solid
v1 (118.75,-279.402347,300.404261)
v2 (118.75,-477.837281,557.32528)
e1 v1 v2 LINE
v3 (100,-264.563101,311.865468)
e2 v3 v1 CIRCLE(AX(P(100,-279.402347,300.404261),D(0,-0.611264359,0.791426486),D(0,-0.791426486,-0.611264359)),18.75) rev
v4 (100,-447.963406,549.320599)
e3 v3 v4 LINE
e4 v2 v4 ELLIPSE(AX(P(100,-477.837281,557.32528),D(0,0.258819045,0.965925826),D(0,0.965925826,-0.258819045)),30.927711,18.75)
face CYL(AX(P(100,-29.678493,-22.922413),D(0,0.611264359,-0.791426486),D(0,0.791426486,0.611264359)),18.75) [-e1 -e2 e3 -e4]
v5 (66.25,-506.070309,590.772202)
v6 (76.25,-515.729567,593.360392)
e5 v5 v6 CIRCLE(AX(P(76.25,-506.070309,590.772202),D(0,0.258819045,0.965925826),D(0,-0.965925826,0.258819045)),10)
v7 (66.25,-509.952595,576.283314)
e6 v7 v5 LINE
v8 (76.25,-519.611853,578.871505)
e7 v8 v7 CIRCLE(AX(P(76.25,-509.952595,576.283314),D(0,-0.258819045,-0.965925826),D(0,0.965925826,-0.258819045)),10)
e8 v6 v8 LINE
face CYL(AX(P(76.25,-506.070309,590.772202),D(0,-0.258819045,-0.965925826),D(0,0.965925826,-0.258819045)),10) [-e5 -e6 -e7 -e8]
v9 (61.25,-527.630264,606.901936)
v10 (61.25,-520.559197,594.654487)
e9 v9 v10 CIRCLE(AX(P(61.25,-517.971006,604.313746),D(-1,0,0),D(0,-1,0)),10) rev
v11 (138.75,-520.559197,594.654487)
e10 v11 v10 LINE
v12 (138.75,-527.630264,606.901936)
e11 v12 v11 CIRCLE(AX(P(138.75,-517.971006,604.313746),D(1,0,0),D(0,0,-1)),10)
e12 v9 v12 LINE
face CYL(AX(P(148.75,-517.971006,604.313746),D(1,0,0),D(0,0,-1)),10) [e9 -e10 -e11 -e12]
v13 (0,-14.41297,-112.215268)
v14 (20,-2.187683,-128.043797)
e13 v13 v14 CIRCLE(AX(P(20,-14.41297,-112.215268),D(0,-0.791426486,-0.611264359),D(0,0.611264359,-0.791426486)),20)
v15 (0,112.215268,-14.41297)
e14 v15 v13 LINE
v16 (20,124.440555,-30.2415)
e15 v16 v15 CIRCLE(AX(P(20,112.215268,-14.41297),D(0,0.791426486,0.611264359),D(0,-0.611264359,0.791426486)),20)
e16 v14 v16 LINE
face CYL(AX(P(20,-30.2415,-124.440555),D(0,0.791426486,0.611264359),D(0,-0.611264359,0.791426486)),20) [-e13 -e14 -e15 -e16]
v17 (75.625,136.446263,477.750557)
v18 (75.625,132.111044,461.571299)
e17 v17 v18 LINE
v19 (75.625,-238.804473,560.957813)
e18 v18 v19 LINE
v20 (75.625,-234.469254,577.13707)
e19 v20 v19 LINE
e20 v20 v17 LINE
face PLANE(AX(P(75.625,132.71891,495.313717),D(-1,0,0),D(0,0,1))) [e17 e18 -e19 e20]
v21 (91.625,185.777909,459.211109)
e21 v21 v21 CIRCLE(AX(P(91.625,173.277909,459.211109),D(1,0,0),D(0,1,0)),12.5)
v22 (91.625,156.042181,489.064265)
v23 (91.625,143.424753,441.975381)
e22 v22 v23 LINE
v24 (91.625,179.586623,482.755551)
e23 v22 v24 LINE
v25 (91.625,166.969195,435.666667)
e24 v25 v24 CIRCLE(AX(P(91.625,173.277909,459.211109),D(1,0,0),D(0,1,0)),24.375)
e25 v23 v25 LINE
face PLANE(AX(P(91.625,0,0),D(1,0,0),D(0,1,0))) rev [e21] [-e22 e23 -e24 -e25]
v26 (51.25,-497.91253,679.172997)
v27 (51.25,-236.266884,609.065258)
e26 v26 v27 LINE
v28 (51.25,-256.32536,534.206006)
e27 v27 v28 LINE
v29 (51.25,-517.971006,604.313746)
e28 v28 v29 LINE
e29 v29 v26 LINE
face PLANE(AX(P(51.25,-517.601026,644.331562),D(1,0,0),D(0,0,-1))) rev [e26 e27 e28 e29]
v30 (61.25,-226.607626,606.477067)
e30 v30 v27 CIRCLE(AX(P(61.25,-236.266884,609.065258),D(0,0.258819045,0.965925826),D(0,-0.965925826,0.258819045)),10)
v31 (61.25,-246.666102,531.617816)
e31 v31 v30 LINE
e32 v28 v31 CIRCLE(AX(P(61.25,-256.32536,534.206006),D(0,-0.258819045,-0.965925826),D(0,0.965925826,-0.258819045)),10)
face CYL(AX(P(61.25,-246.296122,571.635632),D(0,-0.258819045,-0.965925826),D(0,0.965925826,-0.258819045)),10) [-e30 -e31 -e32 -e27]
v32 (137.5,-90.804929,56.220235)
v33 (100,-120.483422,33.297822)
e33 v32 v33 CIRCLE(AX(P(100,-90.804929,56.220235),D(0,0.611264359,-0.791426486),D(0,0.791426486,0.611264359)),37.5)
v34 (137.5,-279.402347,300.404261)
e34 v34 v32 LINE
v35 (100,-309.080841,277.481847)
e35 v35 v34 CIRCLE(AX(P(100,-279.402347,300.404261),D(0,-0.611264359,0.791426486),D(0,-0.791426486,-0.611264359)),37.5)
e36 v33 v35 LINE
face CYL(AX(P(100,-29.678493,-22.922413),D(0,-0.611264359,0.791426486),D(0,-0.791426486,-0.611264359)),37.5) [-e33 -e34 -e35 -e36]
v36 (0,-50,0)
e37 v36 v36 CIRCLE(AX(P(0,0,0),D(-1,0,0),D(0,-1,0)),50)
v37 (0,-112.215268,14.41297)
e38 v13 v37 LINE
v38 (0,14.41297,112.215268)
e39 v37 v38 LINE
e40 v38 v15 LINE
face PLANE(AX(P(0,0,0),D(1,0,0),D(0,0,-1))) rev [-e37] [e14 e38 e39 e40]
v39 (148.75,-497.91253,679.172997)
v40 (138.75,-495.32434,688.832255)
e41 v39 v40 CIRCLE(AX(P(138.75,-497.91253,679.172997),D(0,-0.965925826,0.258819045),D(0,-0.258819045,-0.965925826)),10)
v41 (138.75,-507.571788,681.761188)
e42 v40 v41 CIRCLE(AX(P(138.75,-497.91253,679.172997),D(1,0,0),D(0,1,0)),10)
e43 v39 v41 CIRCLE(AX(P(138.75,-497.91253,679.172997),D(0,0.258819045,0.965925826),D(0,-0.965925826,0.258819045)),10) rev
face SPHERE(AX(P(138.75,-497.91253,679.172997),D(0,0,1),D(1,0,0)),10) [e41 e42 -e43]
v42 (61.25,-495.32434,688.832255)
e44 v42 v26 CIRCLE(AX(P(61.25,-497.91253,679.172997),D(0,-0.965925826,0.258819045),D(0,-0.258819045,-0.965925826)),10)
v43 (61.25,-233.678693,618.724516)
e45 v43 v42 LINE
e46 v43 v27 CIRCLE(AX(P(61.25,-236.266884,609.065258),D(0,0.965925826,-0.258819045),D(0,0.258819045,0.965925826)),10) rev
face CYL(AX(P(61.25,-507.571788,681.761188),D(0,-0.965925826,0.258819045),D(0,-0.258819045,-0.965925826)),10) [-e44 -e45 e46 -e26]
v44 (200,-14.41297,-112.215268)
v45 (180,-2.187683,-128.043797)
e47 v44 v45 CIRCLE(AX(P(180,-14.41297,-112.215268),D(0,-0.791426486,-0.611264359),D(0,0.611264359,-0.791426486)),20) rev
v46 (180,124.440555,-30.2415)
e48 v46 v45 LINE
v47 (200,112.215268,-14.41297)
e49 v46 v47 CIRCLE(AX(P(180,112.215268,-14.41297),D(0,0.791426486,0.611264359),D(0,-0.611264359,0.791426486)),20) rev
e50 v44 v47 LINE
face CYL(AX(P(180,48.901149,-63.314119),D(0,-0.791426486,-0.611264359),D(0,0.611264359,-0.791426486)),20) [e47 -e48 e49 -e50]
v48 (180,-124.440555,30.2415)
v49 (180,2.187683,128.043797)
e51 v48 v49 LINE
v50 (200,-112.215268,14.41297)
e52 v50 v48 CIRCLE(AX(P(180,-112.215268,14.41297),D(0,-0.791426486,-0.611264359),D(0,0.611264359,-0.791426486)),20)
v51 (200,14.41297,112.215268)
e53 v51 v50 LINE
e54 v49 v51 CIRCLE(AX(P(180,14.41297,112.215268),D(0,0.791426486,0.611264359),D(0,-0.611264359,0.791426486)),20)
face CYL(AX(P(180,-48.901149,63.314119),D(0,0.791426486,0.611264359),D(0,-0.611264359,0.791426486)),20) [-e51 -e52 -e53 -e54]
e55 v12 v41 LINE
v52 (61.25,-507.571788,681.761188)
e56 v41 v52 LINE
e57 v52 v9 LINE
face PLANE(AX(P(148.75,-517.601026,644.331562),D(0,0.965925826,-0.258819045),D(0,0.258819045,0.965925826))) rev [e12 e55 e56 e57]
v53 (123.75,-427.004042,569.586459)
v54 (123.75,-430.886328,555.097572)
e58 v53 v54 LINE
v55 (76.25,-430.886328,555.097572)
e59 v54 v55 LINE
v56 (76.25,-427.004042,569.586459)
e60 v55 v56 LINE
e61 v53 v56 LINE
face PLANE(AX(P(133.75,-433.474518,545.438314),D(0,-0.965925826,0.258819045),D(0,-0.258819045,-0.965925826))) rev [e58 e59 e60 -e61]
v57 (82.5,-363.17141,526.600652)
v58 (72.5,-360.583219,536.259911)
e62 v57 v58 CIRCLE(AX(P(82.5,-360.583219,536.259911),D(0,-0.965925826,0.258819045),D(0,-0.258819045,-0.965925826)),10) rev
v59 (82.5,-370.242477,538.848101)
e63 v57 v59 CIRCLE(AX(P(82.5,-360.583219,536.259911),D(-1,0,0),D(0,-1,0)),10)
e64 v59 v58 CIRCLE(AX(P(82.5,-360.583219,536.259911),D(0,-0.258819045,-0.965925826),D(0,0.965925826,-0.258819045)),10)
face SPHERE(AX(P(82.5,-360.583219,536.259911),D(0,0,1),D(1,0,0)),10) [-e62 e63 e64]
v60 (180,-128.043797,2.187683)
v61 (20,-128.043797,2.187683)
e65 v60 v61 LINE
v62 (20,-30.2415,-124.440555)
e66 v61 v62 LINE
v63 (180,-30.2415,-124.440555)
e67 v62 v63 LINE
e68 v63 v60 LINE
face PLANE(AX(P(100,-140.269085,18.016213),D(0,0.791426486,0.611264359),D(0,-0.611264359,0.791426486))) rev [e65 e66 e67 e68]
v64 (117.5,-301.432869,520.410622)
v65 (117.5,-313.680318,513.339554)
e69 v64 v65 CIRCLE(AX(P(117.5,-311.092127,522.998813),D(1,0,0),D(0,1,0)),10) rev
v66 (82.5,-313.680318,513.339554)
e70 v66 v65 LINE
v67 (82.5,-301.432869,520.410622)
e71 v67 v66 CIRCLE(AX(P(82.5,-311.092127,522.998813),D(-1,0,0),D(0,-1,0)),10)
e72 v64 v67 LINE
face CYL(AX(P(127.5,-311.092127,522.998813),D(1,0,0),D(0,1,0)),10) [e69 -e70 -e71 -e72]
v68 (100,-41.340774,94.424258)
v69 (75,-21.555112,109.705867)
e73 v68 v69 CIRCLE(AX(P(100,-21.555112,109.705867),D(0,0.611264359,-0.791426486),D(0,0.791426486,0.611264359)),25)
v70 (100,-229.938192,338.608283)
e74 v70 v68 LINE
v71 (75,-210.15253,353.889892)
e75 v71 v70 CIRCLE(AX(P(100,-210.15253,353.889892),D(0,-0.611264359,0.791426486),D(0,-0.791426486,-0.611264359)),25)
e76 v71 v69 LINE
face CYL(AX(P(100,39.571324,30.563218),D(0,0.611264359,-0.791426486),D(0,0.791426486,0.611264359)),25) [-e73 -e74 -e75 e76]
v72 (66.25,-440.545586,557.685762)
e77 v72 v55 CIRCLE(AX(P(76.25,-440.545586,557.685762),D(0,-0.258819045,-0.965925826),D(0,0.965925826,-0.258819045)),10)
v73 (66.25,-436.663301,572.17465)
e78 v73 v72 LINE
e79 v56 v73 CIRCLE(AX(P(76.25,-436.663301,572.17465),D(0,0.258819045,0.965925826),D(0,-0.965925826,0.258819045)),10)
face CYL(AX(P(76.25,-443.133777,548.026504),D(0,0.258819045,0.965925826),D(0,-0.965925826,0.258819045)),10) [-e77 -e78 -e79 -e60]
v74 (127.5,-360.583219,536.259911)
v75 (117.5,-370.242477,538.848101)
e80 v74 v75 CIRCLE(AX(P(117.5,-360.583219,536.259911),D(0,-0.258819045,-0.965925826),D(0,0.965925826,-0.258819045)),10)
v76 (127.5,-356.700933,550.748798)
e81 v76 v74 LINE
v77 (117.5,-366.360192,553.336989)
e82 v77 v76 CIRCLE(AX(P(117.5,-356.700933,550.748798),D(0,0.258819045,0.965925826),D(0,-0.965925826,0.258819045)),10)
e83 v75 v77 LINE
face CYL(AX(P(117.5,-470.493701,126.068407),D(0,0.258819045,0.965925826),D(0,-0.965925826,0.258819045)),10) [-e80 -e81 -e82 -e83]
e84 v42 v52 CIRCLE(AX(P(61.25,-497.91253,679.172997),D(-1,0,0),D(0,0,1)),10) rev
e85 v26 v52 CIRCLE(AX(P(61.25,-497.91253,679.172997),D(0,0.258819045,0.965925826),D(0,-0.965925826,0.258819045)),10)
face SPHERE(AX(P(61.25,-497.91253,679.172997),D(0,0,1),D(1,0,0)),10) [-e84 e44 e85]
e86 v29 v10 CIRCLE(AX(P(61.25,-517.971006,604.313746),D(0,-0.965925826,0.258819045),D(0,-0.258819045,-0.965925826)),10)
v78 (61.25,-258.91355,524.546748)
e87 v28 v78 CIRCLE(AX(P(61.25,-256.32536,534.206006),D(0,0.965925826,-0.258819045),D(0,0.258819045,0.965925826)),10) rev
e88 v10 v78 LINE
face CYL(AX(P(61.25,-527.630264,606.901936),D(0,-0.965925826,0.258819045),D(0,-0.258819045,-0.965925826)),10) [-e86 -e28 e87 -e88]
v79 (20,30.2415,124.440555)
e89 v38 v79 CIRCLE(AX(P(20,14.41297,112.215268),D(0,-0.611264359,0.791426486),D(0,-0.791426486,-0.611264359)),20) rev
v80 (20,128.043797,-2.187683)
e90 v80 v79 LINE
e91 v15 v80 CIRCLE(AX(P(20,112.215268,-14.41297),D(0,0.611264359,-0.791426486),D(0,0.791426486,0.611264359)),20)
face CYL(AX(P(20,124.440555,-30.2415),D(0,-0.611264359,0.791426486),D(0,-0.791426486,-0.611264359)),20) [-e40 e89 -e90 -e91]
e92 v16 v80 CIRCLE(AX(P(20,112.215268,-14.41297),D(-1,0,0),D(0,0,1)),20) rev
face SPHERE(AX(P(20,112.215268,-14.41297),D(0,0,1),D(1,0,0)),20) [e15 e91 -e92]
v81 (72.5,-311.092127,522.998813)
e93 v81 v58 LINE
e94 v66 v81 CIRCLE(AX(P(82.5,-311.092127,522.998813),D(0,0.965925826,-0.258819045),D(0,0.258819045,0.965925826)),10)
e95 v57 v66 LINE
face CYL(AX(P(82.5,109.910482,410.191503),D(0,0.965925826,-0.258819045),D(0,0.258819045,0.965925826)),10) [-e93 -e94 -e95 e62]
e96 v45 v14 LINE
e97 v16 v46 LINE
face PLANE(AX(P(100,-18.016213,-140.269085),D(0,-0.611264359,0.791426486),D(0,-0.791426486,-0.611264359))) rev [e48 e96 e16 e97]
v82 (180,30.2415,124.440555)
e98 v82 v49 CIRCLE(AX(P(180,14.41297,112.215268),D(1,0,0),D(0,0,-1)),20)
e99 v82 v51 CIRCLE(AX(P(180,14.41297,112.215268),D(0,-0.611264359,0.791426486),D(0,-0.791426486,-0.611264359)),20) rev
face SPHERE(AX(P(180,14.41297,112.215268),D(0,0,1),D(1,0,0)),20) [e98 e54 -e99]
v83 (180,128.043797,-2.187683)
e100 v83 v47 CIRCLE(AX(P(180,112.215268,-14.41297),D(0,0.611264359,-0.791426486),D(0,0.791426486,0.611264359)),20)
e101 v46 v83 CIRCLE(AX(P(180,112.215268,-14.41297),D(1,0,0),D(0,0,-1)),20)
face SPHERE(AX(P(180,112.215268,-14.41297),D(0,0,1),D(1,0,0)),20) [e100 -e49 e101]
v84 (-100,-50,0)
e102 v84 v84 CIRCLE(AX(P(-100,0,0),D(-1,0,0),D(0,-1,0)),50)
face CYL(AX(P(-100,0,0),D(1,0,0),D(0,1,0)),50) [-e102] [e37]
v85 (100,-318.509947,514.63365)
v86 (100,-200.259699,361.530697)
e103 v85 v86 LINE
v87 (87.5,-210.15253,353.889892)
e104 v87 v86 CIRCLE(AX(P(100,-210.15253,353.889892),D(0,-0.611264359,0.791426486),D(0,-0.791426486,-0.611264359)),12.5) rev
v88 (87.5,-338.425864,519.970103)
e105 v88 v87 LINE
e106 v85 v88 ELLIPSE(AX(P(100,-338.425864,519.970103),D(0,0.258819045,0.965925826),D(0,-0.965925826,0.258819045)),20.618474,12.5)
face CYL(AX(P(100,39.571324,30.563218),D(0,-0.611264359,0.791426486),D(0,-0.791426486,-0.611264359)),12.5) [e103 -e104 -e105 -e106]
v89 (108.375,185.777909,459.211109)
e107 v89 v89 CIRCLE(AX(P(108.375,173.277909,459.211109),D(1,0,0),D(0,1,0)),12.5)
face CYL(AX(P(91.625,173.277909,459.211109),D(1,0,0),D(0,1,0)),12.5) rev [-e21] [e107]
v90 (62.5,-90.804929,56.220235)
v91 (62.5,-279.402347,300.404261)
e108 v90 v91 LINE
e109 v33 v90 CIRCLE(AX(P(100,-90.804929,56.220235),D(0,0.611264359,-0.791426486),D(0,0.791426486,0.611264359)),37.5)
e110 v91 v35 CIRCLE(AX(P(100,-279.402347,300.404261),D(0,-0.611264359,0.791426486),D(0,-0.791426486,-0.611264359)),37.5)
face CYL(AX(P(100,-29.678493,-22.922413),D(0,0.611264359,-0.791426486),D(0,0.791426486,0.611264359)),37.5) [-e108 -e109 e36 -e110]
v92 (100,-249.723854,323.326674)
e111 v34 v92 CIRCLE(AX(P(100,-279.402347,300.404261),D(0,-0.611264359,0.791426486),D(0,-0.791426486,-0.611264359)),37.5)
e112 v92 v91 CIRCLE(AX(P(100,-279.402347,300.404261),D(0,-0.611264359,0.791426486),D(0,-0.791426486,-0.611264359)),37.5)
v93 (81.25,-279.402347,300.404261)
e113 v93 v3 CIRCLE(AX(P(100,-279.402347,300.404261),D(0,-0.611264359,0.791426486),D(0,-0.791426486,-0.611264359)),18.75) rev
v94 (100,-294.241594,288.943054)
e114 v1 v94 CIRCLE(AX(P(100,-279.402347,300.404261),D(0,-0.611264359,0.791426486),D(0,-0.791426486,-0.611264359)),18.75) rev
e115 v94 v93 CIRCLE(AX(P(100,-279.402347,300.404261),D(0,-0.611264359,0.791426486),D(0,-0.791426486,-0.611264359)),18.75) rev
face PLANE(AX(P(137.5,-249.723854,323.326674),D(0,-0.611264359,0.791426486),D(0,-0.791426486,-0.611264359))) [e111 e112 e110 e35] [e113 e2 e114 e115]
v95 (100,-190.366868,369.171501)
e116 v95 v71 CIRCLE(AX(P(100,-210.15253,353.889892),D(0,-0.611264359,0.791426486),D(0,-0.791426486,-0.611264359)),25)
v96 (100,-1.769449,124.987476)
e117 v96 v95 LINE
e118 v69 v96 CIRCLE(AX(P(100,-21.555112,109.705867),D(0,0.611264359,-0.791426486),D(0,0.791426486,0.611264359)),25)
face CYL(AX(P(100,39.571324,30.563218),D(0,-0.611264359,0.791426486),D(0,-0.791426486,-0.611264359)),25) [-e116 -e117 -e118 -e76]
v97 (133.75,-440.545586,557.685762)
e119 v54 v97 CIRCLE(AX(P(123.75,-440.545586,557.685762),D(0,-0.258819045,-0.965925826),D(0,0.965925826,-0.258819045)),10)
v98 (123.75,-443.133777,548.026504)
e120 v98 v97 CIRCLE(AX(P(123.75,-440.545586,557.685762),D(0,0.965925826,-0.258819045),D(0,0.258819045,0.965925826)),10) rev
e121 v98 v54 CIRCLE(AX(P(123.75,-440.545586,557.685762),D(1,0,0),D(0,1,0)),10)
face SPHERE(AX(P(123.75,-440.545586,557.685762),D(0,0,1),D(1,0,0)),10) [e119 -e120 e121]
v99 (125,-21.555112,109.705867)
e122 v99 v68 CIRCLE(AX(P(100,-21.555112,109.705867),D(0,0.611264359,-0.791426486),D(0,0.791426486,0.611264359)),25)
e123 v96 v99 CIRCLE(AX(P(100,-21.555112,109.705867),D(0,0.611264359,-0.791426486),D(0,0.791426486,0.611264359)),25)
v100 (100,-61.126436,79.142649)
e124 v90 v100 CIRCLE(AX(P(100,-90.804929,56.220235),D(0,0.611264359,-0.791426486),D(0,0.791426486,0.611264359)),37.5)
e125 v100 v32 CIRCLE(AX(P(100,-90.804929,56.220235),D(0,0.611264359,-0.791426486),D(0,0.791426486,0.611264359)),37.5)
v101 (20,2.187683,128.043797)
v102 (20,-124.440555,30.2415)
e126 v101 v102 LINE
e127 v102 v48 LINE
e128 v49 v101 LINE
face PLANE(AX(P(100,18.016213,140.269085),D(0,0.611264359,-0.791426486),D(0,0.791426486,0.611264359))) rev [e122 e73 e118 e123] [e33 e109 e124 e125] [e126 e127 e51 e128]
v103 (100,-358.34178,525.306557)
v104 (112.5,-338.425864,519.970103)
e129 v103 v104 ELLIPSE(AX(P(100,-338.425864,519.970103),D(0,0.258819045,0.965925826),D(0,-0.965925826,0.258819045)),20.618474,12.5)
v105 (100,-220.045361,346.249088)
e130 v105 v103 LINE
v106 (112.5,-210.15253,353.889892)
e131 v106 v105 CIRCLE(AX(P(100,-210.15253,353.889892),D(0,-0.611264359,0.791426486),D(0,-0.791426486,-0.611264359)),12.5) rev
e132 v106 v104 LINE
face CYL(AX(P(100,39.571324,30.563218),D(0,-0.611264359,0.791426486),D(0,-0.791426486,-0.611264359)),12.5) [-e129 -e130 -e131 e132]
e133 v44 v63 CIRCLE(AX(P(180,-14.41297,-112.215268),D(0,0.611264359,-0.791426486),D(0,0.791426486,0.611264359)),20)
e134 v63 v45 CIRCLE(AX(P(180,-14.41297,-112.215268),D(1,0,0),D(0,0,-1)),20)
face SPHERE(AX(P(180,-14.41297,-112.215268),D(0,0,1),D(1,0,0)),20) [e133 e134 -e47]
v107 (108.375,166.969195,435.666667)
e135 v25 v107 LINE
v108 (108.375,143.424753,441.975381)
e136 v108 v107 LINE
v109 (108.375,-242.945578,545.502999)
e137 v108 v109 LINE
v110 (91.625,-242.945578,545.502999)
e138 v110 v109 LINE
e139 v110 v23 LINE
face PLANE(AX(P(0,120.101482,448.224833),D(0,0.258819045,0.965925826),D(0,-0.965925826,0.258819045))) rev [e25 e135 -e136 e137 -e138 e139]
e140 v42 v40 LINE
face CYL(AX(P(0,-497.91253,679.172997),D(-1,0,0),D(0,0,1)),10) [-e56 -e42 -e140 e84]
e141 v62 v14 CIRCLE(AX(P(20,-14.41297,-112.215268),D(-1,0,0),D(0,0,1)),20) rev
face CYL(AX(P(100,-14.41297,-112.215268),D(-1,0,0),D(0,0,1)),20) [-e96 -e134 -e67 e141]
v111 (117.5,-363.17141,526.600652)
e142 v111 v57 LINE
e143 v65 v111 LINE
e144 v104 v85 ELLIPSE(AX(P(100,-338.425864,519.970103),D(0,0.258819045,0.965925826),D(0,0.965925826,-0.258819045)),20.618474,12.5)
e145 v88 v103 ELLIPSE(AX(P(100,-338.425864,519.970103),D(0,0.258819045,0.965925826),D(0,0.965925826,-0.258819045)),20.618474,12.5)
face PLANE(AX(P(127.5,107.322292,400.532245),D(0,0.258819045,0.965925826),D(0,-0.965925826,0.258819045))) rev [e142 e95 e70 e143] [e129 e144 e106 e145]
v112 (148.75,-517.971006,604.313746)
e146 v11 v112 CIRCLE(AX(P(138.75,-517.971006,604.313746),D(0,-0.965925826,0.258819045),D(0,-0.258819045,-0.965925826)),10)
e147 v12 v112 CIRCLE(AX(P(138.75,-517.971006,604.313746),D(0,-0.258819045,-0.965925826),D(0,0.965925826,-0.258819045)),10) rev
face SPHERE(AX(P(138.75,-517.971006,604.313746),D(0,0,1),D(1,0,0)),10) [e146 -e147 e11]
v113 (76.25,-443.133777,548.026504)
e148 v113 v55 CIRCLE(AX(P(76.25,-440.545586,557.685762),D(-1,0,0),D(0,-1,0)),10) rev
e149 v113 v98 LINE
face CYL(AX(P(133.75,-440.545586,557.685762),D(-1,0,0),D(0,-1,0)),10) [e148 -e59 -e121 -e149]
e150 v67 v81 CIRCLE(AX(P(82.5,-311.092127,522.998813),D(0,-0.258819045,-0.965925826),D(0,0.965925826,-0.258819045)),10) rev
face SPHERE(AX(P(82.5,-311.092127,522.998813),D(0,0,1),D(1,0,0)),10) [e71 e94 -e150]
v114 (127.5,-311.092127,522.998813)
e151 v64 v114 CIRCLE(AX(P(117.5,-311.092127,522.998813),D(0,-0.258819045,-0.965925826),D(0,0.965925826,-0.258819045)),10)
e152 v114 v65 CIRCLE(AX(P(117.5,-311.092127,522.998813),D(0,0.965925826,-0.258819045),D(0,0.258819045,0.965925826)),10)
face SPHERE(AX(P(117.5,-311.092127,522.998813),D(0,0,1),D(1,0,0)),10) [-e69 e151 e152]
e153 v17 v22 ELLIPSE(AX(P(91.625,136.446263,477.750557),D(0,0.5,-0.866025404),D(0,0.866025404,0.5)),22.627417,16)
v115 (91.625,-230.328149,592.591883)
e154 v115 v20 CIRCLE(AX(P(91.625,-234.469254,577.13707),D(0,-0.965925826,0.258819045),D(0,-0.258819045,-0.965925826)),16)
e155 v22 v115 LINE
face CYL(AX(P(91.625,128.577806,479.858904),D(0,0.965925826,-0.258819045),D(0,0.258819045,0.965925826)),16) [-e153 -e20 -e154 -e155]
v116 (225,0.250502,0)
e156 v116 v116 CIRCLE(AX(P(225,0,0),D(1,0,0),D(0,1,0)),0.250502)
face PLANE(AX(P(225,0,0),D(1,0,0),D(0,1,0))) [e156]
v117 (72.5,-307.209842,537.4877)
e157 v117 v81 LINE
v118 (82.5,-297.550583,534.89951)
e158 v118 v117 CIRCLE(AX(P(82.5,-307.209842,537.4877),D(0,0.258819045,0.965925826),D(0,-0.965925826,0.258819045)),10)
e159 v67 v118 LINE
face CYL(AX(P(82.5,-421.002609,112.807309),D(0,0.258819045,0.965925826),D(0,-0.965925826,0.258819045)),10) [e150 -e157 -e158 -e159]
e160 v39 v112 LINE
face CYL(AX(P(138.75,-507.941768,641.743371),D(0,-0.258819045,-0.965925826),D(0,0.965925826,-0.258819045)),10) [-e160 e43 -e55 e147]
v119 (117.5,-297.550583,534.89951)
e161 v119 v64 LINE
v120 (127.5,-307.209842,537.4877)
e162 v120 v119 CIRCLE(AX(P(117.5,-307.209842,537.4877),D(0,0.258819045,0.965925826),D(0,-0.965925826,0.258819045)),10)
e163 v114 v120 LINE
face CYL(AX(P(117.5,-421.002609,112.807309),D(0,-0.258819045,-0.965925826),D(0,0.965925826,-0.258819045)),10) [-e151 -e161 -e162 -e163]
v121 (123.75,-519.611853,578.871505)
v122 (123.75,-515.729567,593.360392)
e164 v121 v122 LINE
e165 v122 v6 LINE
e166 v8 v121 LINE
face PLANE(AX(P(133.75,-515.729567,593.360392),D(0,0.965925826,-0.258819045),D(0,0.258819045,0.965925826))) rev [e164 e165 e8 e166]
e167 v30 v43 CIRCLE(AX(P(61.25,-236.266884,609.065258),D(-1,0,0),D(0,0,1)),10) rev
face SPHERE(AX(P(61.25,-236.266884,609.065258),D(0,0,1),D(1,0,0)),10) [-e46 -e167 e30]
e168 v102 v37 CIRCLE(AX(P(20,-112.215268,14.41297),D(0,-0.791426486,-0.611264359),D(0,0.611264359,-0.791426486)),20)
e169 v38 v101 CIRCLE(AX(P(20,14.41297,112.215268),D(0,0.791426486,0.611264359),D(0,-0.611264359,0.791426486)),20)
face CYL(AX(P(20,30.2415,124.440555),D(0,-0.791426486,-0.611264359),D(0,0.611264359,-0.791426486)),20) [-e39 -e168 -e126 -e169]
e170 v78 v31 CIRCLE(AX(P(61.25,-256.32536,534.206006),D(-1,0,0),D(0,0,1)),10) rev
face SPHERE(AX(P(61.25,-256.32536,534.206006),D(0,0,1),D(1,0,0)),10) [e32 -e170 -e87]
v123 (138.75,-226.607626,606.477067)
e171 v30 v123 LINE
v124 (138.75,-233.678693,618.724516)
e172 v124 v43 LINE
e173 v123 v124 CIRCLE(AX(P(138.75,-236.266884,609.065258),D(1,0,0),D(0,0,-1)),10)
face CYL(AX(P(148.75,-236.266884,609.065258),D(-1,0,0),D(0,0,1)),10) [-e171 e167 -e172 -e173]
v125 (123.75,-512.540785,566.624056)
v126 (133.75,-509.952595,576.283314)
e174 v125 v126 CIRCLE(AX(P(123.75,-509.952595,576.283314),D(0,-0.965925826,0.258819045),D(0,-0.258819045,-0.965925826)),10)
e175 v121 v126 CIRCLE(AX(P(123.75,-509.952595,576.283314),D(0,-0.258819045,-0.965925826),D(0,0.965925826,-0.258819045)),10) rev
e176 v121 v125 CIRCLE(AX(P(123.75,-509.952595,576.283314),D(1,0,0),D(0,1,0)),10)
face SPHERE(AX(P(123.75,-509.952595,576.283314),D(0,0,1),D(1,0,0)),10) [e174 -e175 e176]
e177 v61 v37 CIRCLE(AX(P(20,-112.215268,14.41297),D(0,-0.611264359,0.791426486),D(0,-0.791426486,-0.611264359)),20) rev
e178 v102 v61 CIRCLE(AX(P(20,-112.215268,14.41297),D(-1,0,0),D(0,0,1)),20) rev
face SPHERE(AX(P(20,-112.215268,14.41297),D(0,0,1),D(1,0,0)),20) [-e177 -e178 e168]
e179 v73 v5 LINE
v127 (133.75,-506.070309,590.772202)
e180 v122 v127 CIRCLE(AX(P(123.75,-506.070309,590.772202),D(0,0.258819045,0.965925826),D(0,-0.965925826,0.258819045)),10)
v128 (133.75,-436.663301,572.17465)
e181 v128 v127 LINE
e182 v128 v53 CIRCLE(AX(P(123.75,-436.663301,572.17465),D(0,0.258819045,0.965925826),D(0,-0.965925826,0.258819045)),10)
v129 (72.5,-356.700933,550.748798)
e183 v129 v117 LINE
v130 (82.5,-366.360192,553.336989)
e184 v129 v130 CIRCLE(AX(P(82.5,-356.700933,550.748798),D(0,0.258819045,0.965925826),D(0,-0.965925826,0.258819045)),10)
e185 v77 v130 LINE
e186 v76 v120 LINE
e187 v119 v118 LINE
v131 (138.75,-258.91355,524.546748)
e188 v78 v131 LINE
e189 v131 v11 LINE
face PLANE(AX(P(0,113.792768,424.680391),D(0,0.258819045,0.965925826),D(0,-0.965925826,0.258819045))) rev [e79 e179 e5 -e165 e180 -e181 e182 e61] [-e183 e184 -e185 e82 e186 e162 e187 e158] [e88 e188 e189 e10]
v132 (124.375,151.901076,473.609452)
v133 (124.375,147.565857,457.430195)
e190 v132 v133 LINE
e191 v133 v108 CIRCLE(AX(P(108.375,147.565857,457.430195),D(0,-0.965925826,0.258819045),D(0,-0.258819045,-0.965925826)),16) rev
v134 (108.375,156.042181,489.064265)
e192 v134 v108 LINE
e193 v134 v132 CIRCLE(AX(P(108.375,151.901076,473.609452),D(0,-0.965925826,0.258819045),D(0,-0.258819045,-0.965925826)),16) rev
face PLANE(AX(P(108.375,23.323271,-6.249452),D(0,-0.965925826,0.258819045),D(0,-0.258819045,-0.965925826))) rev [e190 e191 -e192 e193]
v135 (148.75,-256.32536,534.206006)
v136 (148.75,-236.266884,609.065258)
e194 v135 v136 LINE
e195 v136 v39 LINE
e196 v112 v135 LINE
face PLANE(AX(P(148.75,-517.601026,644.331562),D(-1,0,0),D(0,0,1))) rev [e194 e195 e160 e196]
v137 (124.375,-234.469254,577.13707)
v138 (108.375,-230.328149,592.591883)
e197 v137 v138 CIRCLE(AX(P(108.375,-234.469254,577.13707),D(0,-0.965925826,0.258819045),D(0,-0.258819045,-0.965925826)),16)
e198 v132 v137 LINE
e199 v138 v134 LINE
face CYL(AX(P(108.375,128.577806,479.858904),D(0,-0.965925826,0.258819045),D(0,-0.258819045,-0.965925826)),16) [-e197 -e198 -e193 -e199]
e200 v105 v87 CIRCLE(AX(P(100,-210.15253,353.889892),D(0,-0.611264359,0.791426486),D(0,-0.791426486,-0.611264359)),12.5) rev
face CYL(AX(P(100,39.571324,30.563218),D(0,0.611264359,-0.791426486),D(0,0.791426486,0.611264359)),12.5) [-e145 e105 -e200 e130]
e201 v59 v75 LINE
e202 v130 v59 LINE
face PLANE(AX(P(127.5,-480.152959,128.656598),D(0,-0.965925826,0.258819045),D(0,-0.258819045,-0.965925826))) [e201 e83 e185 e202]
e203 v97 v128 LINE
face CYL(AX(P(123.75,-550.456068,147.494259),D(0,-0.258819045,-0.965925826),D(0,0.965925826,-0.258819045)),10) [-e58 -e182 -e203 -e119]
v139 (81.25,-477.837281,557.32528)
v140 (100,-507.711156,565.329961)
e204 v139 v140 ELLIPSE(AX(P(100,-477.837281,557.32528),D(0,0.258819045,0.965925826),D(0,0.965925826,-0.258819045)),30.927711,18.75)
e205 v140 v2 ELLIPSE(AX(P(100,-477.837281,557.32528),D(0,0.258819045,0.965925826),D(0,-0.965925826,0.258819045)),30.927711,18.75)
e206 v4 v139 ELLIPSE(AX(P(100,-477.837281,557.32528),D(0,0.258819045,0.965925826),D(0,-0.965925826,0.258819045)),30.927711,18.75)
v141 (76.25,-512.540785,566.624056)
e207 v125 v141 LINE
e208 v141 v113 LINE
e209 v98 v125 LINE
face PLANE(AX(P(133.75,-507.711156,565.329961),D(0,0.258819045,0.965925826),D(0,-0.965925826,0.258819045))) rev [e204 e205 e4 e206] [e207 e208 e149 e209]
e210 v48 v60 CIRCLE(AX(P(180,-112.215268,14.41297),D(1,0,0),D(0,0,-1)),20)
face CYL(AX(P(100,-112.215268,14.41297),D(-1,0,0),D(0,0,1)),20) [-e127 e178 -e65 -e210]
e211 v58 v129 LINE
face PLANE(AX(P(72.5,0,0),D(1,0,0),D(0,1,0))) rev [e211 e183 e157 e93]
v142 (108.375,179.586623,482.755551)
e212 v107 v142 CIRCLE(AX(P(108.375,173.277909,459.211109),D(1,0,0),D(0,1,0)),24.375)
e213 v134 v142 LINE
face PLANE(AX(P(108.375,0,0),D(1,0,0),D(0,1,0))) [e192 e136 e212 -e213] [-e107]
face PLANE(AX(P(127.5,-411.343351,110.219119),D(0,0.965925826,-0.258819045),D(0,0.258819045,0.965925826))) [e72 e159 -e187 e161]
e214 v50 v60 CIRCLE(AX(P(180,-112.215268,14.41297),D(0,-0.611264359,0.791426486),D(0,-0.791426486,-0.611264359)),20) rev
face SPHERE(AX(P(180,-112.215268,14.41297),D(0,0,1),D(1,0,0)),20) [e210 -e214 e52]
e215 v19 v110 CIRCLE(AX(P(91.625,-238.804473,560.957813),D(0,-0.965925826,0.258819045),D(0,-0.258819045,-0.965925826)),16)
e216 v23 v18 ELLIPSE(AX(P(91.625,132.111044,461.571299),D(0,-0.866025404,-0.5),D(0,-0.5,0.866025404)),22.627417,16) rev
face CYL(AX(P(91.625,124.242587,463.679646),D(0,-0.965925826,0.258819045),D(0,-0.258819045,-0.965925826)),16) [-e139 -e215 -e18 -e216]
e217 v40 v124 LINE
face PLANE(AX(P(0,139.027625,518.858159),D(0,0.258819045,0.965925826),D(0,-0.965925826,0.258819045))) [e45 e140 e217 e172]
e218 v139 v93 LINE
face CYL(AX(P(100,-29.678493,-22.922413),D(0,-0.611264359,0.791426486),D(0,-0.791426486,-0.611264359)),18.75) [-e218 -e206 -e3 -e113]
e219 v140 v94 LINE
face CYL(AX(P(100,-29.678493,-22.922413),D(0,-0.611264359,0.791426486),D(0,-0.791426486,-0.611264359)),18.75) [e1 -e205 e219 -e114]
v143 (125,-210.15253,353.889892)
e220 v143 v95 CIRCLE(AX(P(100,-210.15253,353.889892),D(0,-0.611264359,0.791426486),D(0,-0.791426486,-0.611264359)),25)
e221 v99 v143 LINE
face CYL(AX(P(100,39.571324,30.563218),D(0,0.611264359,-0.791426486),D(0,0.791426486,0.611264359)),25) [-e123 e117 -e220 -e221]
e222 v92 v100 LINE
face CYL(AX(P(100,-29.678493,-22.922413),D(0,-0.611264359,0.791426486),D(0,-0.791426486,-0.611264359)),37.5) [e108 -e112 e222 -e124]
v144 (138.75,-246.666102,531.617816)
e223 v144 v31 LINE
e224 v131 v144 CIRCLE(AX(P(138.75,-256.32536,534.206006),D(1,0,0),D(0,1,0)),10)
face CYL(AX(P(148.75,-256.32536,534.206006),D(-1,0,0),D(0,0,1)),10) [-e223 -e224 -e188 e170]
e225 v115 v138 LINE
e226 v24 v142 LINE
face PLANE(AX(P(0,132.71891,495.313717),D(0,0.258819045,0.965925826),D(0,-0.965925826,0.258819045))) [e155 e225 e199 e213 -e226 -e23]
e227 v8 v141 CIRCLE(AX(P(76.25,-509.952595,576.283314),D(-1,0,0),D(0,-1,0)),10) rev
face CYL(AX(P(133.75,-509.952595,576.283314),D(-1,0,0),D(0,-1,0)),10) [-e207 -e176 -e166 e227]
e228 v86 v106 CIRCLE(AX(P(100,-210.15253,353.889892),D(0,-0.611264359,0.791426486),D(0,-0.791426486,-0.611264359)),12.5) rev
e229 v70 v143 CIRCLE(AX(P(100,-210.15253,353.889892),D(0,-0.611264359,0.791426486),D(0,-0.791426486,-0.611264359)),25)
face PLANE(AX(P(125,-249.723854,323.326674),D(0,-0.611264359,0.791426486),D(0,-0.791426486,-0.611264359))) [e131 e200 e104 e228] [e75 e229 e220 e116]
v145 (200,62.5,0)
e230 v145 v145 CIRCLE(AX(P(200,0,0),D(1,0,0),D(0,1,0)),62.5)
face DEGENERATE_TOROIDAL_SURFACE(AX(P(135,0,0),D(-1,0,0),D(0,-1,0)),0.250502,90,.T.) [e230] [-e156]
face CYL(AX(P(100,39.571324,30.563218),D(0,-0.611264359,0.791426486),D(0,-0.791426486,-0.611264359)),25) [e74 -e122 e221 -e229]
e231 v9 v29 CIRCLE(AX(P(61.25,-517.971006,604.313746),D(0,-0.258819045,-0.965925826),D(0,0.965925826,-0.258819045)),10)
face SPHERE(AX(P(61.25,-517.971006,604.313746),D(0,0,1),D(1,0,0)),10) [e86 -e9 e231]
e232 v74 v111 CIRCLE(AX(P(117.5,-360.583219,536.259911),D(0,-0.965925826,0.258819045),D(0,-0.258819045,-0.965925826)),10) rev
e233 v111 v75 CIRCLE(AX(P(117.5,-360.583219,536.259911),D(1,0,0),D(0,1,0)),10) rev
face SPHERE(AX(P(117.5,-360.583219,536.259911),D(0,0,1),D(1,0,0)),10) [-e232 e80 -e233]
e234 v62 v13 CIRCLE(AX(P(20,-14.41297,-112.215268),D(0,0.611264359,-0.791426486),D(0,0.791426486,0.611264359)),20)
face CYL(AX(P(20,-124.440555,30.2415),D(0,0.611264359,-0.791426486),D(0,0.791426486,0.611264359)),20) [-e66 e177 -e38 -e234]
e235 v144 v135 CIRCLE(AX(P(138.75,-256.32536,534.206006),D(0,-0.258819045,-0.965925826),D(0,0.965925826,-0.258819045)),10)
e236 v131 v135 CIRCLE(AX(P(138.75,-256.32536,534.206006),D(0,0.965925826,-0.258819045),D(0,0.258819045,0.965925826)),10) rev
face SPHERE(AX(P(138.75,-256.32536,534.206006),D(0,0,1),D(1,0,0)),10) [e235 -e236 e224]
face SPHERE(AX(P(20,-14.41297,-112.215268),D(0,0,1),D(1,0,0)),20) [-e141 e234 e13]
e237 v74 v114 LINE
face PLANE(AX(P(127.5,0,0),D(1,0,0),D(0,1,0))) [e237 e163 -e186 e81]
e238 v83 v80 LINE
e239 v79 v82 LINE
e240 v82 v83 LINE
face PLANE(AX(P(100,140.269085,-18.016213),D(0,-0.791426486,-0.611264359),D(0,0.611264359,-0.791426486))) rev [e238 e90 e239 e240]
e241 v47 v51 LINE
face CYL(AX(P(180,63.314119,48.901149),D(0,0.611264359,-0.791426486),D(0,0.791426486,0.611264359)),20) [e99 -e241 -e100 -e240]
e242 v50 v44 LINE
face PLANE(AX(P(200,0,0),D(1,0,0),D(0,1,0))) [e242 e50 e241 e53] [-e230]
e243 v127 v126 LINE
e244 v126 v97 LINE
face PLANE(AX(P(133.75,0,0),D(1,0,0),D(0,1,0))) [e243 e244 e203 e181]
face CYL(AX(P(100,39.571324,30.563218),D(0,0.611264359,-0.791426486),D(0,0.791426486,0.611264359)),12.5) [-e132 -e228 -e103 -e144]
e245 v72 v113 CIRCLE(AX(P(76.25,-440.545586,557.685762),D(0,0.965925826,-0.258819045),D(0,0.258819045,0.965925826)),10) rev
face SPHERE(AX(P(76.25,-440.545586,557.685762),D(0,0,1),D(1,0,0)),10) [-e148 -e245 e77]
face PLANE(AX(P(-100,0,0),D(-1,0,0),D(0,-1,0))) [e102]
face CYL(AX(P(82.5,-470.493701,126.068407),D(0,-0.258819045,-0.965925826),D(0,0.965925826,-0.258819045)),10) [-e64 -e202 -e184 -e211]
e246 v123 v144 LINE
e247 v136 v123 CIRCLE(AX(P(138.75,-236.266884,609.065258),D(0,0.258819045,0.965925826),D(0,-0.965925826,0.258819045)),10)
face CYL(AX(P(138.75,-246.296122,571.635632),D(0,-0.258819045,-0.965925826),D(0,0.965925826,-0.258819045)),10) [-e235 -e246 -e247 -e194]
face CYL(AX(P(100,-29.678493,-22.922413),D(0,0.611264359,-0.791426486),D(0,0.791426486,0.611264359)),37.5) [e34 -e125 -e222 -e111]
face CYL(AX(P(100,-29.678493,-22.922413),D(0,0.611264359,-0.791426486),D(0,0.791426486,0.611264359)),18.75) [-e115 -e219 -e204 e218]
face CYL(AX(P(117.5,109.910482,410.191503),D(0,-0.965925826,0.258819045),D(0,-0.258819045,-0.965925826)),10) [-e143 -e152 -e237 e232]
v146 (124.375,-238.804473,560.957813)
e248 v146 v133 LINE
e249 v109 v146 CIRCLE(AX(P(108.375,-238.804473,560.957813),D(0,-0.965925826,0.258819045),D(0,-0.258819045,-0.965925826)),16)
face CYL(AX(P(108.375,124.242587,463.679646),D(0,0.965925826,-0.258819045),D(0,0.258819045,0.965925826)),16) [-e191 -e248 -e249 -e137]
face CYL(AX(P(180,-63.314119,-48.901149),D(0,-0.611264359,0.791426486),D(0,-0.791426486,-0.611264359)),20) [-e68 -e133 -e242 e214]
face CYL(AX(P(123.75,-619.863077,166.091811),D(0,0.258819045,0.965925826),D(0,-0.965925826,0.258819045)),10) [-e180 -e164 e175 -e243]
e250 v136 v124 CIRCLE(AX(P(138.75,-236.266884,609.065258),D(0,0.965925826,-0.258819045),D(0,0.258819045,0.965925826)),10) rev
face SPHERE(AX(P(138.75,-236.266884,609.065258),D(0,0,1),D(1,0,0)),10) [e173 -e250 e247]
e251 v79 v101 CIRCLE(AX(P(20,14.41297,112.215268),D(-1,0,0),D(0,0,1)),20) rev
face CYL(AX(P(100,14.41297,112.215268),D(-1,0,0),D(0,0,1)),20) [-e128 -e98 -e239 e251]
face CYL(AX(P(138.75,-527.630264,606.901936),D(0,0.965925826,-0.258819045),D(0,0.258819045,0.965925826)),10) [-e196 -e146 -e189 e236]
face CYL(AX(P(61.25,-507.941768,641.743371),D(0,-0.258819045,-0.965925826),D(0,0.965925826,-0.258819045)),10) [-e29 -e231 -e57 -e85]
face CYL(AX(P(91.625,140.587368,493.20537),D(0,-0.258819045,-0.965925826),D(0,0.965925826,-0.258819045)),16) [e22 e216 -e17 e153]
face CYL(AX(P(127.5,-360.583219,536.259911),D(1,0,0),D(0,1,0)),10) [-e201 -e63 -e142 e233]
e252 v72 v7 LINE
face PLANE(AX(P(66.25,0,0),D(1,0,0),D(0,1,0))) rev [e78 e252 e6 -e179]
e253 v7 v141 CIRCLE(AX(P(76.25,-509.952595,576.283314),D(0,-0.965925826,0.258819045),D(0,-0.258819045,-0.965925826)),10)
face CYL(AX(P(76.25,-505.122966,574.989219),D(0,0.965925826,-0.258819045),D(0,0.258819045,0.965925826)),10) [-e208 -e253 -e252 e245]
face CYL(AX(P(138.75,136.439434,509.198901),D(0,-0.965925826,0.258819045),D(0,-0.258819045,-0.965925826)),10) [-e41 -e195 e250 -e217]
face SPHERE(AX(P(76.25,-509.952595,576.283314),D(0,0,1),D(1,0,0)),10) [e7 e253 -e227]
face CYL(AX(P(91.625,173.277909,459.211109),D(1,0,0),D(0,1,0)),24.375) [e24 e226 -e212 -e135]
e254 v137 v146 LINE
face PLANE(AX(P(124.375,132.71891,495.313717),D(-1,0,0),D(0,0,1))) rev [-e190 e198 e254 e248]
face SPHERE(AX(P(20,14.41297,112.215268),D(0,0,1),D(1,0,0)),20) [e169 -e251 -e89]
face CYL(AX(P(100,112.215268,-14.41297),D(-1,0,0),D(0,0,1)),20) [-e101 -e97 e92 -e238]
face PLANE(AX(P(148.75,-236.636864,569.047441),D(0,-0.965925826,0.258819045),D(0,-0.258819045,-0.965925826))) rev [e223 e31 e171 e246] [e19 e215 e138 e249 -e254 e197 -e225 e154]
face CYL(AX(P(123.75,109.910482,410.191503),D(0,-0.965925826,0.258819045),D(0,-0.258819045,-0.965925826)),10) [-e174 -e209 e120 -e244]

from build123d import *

# Parameters (mm, degrees)
BOSS_EXTRUDE1_DEPTH  = 100
SKETCH5_R            = 50
BOSS_EXTRUDE2_DEPTH  = 100
BOSS_EXTRUDE3_DEPTH  = 100
BOSS_EXTRUDE4_DEPTH  = 37.5
BOSS_EXTRUDE5_DEPTH  = 37.5
BOSS_EXTRUDE6_DEPTH  = 25
BOSS_EXTRUDE7_DEPTH  = 25
BOSS_EXTRUDE8_DEPTH  = 18.75
BOSS_EXTRUDE9_DEPTH  = 18.75
BOSS_EXTRUDE10_DEPTH = 12.5
BOSS_EXTRUDE11_DEPTH = 12.5
BOSS_EXTRUDE12_DEPTH = 27.5
BOSS_EXTRUDE13_DEPTH = 27.5
BOSS_EXTRUDE14_DEPTH = 33.75
BOSS_EXTRUDE15_DEPTH = 33.75
SKETCH9_W            = 97.5
SKETCH9_H            = 290.87550519886753
BOSS_EXTRUDE17_DEPTH = 48.75
SKETCH11_W           = 97.5
SKETCH11_H           = 290.8755051988676
BOSS_EXTRUDE18_DEPTH = 48.75
SKETCH11_3_W         = 48.749999999999986
SKETCH11_3_H         = 400.00000000000006
BOSS_EXTRUDE19_DEPTH = 24.375
SKETCH11_4_W         = 48.749999999999986
SKETCH11_4_H         = 400.00000000000006
BOSS_EXTRUDE20_DEPTH = 24.375
SKETCH12_R           = 62.5
BOSS_EXTRUDE21_DEPTH = 25
FILLET1_R            = 90
SKETCH13_R           = 12.500000000000005
BOSS_EXTRUDE22_DEPTH = 32.75
SKETCH13_4_R         = 24.374999999999968
SKETCH13_4_R_2       = 12.500000000000005
CUT_EXTRUDE1_DEPTH   = 16
FILLET2_R            = 20
FILLET3_R            = 25
FILLET4_R            = 12.5
FILLET5_R            = 37.5
FILLET6_R            = 18.75
FILLET7_R            = 10
FILLET8_R            = 16


# Some blends are built 0.0001 mm under size
with BuildPart() as part:
    # Sketch4 → Boss-Extrude1 (new body)
    with BuildSketch(Plane(origin=(0, 0, 0), x_dir=(0, 0, -1), z_dir=(1, 0, 0))):
        Polygon((-18.016212694338478, -140.26908454877824), (140.26908454877824, -18.016212694338257), (18.01621269433834, 140.26908454877835), (-140.26908454877835, 18.0162126943387), align=None)
    extrude(amount=BOSS_EXTRUDE1_DEPTH)

    # Sketch5 → Boss-Extrude2 (add)
    with BuildSketch(Plane.ZY):
        with Locations(Location((0, 0, 0), (0, 0, 270))):
            Circle(SKETCH5_R)
    extrude(amount=BOSS_EXTRUDE2_DEPTH)

    # Sketch7 → Boss-Extrude3 (add)
    with BuildSketch(Plane(origin=(99.99999999999976, 6.983e-13, 0), x_dir=(0, 0, -1), z_dir=(1, 6.98e-15, 0))):
        Polygon((140.26908454877824, -18.016212694338954), (18.01621269433834, 140.26908454877764), (-140.26908454877835, 18.016212694338005), (-18.016212694338478, -140.26908454877892), align=None)
    extrude(amount=BOSS_EXTRUDE3_DEPTH)

    # Sketch7<4> → Boss-Extrude4 (add)
    with BuildSketch(Plane(origin=(99.99999999999976, 6.983e-13, 0), x_dir=(0, 0, -1), z_dir=(1, 6.98e-15, 0))):
        Polygon((-33.29782167614346, -120.4834223933893), (-79.1426486215579, -61.126435927221124), (-323.32667424661275, -249.72385409291445), (-311.86546751025963, -264.5631007094558), (-288.94305403755214, -294.2415939425403), (-277.4818473011984, -309.08084055908245), align=None)
    extrude(amount=BOSS_EXTRUDE4_DEPTH)

    # Sketch7<5> → Boss-Extrude5 (add)
    with BuildSketch(Plane(origin=(99.99999999999976, 6.983e-13, 0), x_dir=(0, 0, -1), z_dir=(1, 6.98e-15, 0))):
        Polygon((-33.29782167614346, -120.4834223933893), (-79.1426486215579, -61.126435927221124), (-323.32667424661275, -249.72385409291445), (-311.86546751025963, -264.5631007094558), (-288.94305403755214, -294.2415939425403), (-277.4818473011984, -309.08084055908245), align=None)
    extrude(amount=-BOSS_EXTRUDE5_DEPTH)

    # Sketch7<6> → Boss-Extrude6 (add)
    with BuildSketch(Plane(origin=(99.99999999999976, 6.983e-13, 0), x_dir=(0, 0, -1), z_dir=(1, 6.98e-15, 0))):
        Polygon((-94.42425760336783, -41.3407737718251), (-124.98747556697336, -1.7694494610516216), (-369.17150119202836, -190.36686762674503), (-361.53069670112586, -200.2596987044398), (-346.2490877193208, -220.04536085982943), (-338.60828322842275, -229.93819193751852), align=None)
    extrude(amount=BOSS_EXTRUDE6_DEPTH)

    # Sketch7<7> → Boss-Extrude7 (add)
    with BuildSketch(Plane(origin=(99.99999999999976, 6.983e-13, 0), x_dir=(0, 0, -1), z_dir=(1, 6.98e-15, 0))):
        Polygon((-94.42425760336783, -41.3407737718251), (-124.98747556697336, -1.7694494610516216), (-369.17150119202836, -190.36686762674503), (-361.53069670112586, -200.2596987044398), (-346.2490877193208, -220.04536085982943), (-338.60828322842275, -229.93819193751852), align=None)
    extrude(amount=-BOSS_EXTRUDE7_DEPTH)

    # Sketch7<8> → Boss-Extrude8 (add)
    with BuildSketch(Plane(origin=(99.99999999999976, 6.983e-13, 0), x_dir=(0, 0, -1), z_dir=(1, 6.98e-15, 0))):
        Polygon((-288.94305403755214, -294.2415939425403), (-311.86546751025963, -264.5631007094558), (-549.3205994238973, -447.963405846006), (-565.3299608600691, -507.7111561225338), align=None)
    extrude(amount=BOSS_EXTRUDE8_DEPTH)

    # Sketch7<9> → Boss-Extrude9 (add)
    with BuildSketch(Plane(origin=(99.99999999999976, 6.983e-13, 0), x_dir=(0, 0, -1), z_dir=(1, 6.98e-15, 0))):
        Polygon((-288.94305403755214, -294.2415939425403), (-311.86546751025963, -264.5631007094558), (-549.3205994238973, -447.963405846006), (-565.3299608600691, -507.7111561225338), align=None)
    extrude(amount=-BOSS_EXTRUDE9_DEPTH)

    # Sketch7<10> → Boss-Extrude10 (add)
    with BuildSketch(Plane(origin=(99.99999999999976, 6.983e-13, 0), x_dir=(0, 0, -1), z_dir=(1, 6.98e-15, 0))):
        Polygon((-346.2490877193208, -220.04536085982943), (-361.53069670112586, -200.2596987044398), (-514.6336496455251, -318.50994691352884), (-525.3065572696396, -358.3417804312143), align=None)
    extrude(amount=BOSS_EXTRUDE10_DEPTH)

    # Sketch7<11> → Boss-Extrude11 (add)
    with BuildSketch(Plane(origin=(99.99999999999976, 6.983e-13, 0), x_dir=(0, 0, -1), z_dir=(1, 6.98e-15, 0))):
        Polygon((-346.2490877193208, -220.04536085982943), (-361.53069670112586, -200.2596987044398), (-514.6336496455251, -318.50994691352884), (-525.3065572696396, -358.3417804312143), align=None)
    extrude(amount=-BOSS_EXTRUDE11_DEPTH)

    # Sketch7<12> → Boss-Extrude12 (add)
    with BuildSketch(Plane(origin=(99.99999999999976, 6.983e-13, 0), x_dir=(0, 0, -1), z_dir=(1, 6.98e-15, 0))):
        Polygon((-525.3065572696396, -358.3417804312143), (-514.6336496455251, -318.50994691352884), (-510.75136396898733, -304.0210595191928), (-534.8995096262141, -297.55058339162974), (-553.336988603405, -366.3601916979868), (-529.1888429461774, -372.8306678255503), align=None)
    extrude(amount=BOSS_EXTRUDE12_DEPTH)

    # Sketch7<13> → Boss-Extrude13 (add)
    with BuildSketch(Plane(origin=(99.99999999999976, 6.983e-13, 0), x_dir=(0, 0, -1), z_dir=(1, 6.98e-15, 0))):
        Polygon((-525.3065572696396, -358.3417804312143), (-514.6336496455251, -318.50994691352884), (-510.75136396898733, -304.0210595191928), (-534.8995096262141, -297.55058339162974), (-553.336988603405, -366.3601916979868), (-529.1888429461774, -372.8306678255503), align=None)
    extrude(amount=-BOSS_EXTRUDE13_DEPTH)

    # Sketch7<14> → Boss-Extrude14 (add)
    with BuildSketch(Plane(origin=(99.99999999999976, 6.983e-13, 0), x_dir=(0, 0, -1), z_dir=(1, 6.98e-15, 0))):
        Polygon((-565.3299608600691, -507.7111561225338), (-549.3205994238973, -447.963405846006), (-545.4383137473595, -433.47451845167), (-569.5864594045863, -427.00404232410705), (-593.3603921938336, -515.729567389307), (-569.212246536607, -522.2000435168699), align=None)
    extrude(amount=BOSS_EXTRUDE14_DEPTH)

    # Sketch7<15> → Boss-Extrude15 (add)
    with BuildSketch(Plane(origin=(99.99999999999976, 6.983e-13, 0), x_dir=(0, 0, -1), z_dir=(1, 6.98e-15, 0))):
        Polygon((-565.3299608600691, -507.7111561225338), (-549.3205994238973, -447.963405846006), (-545.4383137473595, -433.47451845167), (-569.5864594045863, -427.00404232410705), (-593.3603921938336, -515.729567389307), (-569.212246536607, -522.2000435168699), align=None)
    extrude(amount=-BOSS_EXTRUDE15_DEPTH)

    # Sketch9 → Boss-Extrude17 (add)
    with BuildSketch(Plane(origin=(-7.9461e-13, 113.79276777475518, 424.680390869267), x_dir=(1, 4.7e-16, 1.75e-15), z_dir=(-1.807323732225277e-15, 0.25881904510252407, 0.9659258262890675))):
        with Locations((100.00000000000355, -521.2917260320522)):
            Rectangle(SKETCH9_W, SKETCH9_H)
    extrude(amount=BOSS_EXTRUDE17_DEPTH)

    # Sketch11 → Boss-Extrude18 (add)
    with BuildSketch(Plane(origin=(-6.0917e-13, 126.41019622350585, 471.7692749008552), x_dir=(1, 3.2e-16, 1.2e-15), z_dir=(-1.2472477168906274e-15, 0.25881904510253106, 0.9659258262890656))):
        with Locations((100.00000000000327, -521.2917260320559)):
            Rectangle(SKETCH11_W, SKETCH11_H)
    extrude(amount=BOSS_EXTRUDE18_DEPTH)

    # Sketch11<3> → Boss-Extrude19 (add)
    with BuildSketch(Plane(origin=(-6.0917e-13, 126.41019622350585, 471.7692749008552), x_dir=(1, 3.2e-16, 1.2e-15), z_dir=(-1.2472477168906274e-15, 0.25881904510253106, 0.9659258262890656))):
        with Locations((100.00000000000324, -175.85397343262204)):
            Rectangle(SKETCH11_3_W, SKETCH11_3_H)
    extrude(amount=BOSS_EXTRUDE19_DEPTH)

    # Sketch11<4> → Boss-Extrude20 (add)
    with BuildSketch(Plane(origin=(-6.0917e-13, 126.41019622350585, 471.7692749008552), x_dir=(1, 3.2e-16, 1.2e-15), z_dir=(-1.2472477168906274e-15, 0.25881904510253106, 0.9659258262890656))):
        with Locations((100.00000000000324, -175.85397343262204)):
            Rectangle(SKETCH11_4_W, SKETCH11_4_H)
    extrude(amount=-BOSS_EXTRUDE20_DEPTH)

    # Sketch12 → Boss-Extrude21 (add)
    with BuildSketch(Plane(origin=(199.99999999999974, 2.79398e-12, 0), x_dir=(0, 0, -1), z_dir=(1, 1.397e-14, 0))):
        with Locations(Location((0, 0, 0), (0, 0, 90))):
            Circle(SKETCH12_R)
    extrude(amount=BOSS_EXTRUDE21_DEPTH)

    # Fillet1
    # the kernel refuses this fillet: 90 mm, written as the material it takes off along each edge
    with BuildSketch(Plane(origin=(224.99999999999974, 3.14323e-12, 0), x_dir=(-1.41e-14, 1, -6e-17), z_dir=(0, -6e-17, -1))) as fillet1_piece_1:
        with BuildLine():
            CenterArc((0.25050201005633005, -90), FILLET1_R, 46.23825730732019, 43.761742692679825)
            Line((0.25050201005631856, 3.53e-15), (0.25050201005631834, 1.800000000000015))
            Line((0.25050201005631834, 1.800000000000015), (62.5, 1.8000000000000114))
            Line((62.5, 1.8000000000000114), (64.3, -3.05e-15))
            ThreePointArc((64.3, -3.05e-15), (64.3, -12.500000000000004), (63.74498995979888, -23.7))
            Line((63.74498995979888, -23.7), (62.50000000000001, -25))
        make_face()
    revolve(axis=Axis((224.99999999999974, 3.14323e-12, 0), (1, 1.397e-14, 0)), mode=Mode.SUBTRACT)

    # Sketch13 → Boss-Extrude22 (add)
    with BuildSketch(Plane(origin=(124.37500000000372, 9.0866e-13, 1.4984e-13), x_dir=(1.2e-15, 0, -1), z_dir=(1, 7.31e-15, 1.2e-15))):
        with BuildLine():
            Line((-441.9753813458701, 143.4247526628231), (-435.66666712149606, 166.96919467861932))
            ThreePointArc((-435.66666712149606, 166.96919467861932), (-452.90239491291806, 196.8223509187893), (-482.75555115308805, 179.58662312736732))
            Line((-482.7555511530881, 179.58662312736735), (-489.06426537746205, 156.0421811115715))
            Line((-489.06426537746205, 156.0421811115715), (-441.9753813458701, 143.4247526628231))
        make_face()
        with Locations(Location((-459.21110913729206, 173.27790890299332, 0), (0, 0, 90))):
            Circle(SKETCH13_R, mode=Mode.SUBTRACT)
    extrude(amount=-BOSS_EXTRUDE22_DEPTH)

    # Sketch13<4> → Cut-Extrude1 (cut)
    # profile 1 of 3: a face of its own
    with BuildSketch(Plane(origin=(124.37500000000372, 9.0866e-13, 1.4984e-13), x_dir=(1.2e-15, 0, -1), z_dir=(1, 7.31e-15, 1.2e-15))):
        with BuildLine():
            Line((-465.5198234930759, 149.73346692240844), (-441.9753813458701, 143.4247526628231))
            Line((-441.9753813458701, 143.4247526628231), (-435.66666712149606, 166.96919467861932))
            ThreePointArc((-435.66666712149606, 166.96919467861932), (-447.02360919620156, 152.16853965173627), (-465.5198234930759, 149.73346692240847))
        make_face()
    # profile 2 of 3: a face of its own
    with BuildSketch(Plane(origin=(124.37500000000372, 9.0866e-13, 1.4984e-13), x_dir=(1.2e-15, 0, -1), z_dir=(1, 7.31e-15, 1.2e-15))):
        with Locations((-459.21110913729206, 173.27790890299332)):
            Circle(SKETCH13_4_R)
        with Locations(Location((-459.21110913729206, 173.27790890299332, 0), (0, 0, 90))):
            Circle(SKETCH13_4_R_2, mode=Mode.SUBTRACT)
    # profile 3 of 3: a face of its own
    with BuildSketch(Plane(origin=(124.37500000000372, 9.0866e-13, 1.4984e-13), x_dir=(1.2e-15, 0, -1), z_dir=(1, 7.31e-15, 1.2e-15))):
        with BuildLine():
            Line((-489.06426537746205, 156.0421811115715), (-465.5198234930759, 149.73346692240844))
            ThreePointArc((-465.5198234930759, 149.73346692240847), (-480.32047838854913, 161.0904089619028), (-482.75555115308805, 179.58662312736732))
            Line((-482.7555511530881, 179.58662312736735), (-489.06426537746205, 156.0421811115715))
        make_face()
    extrude(amount=-CUT_EXTRUDE1_DEPTH, mode=Mode.SUBTRACT)

    # Fillet2
    fillet2_edges = [part.edges().sort_by_distance(p)[0] for p in [
        (199.99999999999935, 61.12643592722074, -79.1426486215583),
        (199.99999999999923, 79.1426486215592, 61.12643592722003),
        (200.0000000000002, -61.126435927219056, 79.14264862155841),
        (200.0000000000003, -79.14264862155753, -61.12643592721989),
        (0, 79.14264862155852, 61.12643592722003),
        (0, 61.126435927220065, -79.14264862155828),
        (0, -79.14264862155824, -61.12643592721989),
        (0, -61.12643592721976, 79.14264862155841),
        (99.99999999999983, 18.016212694339053, 140.26908454877835),
        (99.9999999999994, 140.2690845487787, -18.01621269433834),
        (99.99999999999994, -18.01621269433791, -140.26908454877824),
        (100.00000000000037, -140.26908454877787, 18.016212694338478),
    ]]
    fillet(fillet2_edges, radius=FILLET2_R)

    # Fillet3
    fillet3_edges = [part.edges().sort_by_distance(p)[0] for p in [
        (125.00000000000071, -135.6394828546709, 216.51627041589526),
        (125.00000000000043, -96.06815854389748, 247.07948837950087),
        (75.00000000000071, -135.63948285467126, 216.51627041589526),
        (75.00000000000043, -96.06815854389782, 247.07948837950087),
    ]]
    fillet(fillet3_edges, radius=FILLET3_R - 0.0001)  # a hair under: the kernel refuses the full size

    # Fillet4
    fillet4_edges = [part.edges().sort_by_distance(p)[0] for p in [
        (87.50000000000178, -289.1935706455212, 435.77782249448023),
        (112.50000000000156, -259.38482280898353, 438.0821731733255),
        (87.50000000000156, -259.3848228089837, 438.0821731733255),
        (112.50000000000178, -289.19357064552105, 435.77782249448023),
    ]]
    fillet(fillet4_edges, radius=FILLET4_R - 0.0001)  # a hair under: the kernel refuses the full size

    # Fillet5
    fillet5_edges = [part.edges().sort_by_distance(p)[0] for p in [
        (62.500000000000846, -155.42514501006733, 201.23466143408527),
        (62.50000000000126, -214.78213147623538, 155.38983448867086),
        (137.50000000000128, -214.78213147623484, 155.38983448867086),
        (137.50000000000085, -155.42514501006679, 201.23466143408527),
    ]]
    fillet(fillet5_edges, radius=FILLET5_R - 0.0001)  # a hair under: the kernel refuses the full size

    # Fillet6
    fillet6_edges = [part.edges().sort_by_distance(p)[0] for p in [
        (118.75000000000256, -400.97637503253617, 427.1365074488107),
        (81.25000000000256, -400.97637503253645, 427.1365074488107),
        (118.75000000000225, -356.26325327773003, 430.5930334670785),
        (81.25000000000225, -356.2632532777303, 430.5930334670785),
    ]]
    fillet(fillet6_edges, radius=FILLET6_R - 0.0001)  # a hair under: the kernel refuses the full size

    # Fillet7
    fillet7_edges = [part.edges().sort_by_distance(p)[0] for p in [
        (100.00000000000236, -372.83066782554954, 529.1888429461774),
        (127.50000000000186, -300.78582145541037, 522.8254367976008),
        (100.00000000000188, -304.02105951919214, 510.75136396898733),
        (127.50000000000234, -369.5954297617676, 541.2629157747912),
        (127.50000000000212, -338.4258636723706, 519.9701034575824),
        (72.50000000000212, -338.42586367237107, 519.9701034575824),
        (72.50000000000186, -300.78582145541077, 522.8254367976008),
        (72.50000000000234, -369.595429761768, 541.2629157747912),
        (100.00000000000341, -522.2000435168692, 569.212246536607),
        (100.0000000000028, -433.4745184516693, 545.4383137473595),
        (133.75000000000313, -477.837280984269, 557.3252801419833),
        (133.75000000000279, -430.2392803878876, 557.5123865759729),
        (133.7500000000034, -518.9648054530876, 581.2863193652203),
        (66.2500000000031, -477.83728098426946, 557.3252801419833),
        (66.25000000000338, -518.964805453088, 581.2863193652203),
        (66.25000000000276, -430.2392803878881, 557.5123865759729),
        (148.75000000000276, -389.736373430409, 559.6006176207296),
        (148.75000000000267, -517.6010263348937, 644.3315619019651),
        (100.00000000000276, -249.25429207717593, 521.958557371087),
        (148.75000000000267, -236.63686362842782, 569.0474414026788),
        (51.25000000000275, -389.73637343040906, 559.6006176207294),
        (51.25000000000267, -236.63686362842788, 569.0474414026787),
        (100.00000000000276, -530.2184547836422, 597.2426778703721),
        (51.25000000000267, -517.6010263348938, 644.3315619019648),
        (100.0000000000026, -224.01943517967973, 616.1363254342706),
        (51.2500000000026, -364.50151653291255, 653.7783856839142),
        (100.0000000000026, -504.9835978861454, 691.4204459335579),
        (148.7500000000026, -364.50151653291255, 653.7783856839143),
    ]]
    fillet(fillet7_edges, radius=FILLET7_R)

    # Fillet8
    fillet8_edges = [part.edges().sort_by_distance(p)[0] for p in [
        (75.62500000000264, 149.73346688719815, 465.51982336166617),
        (75.62500000000267, -49.76041259498918, 493.73919036637636),
        (75.62500000000261, -37.14298414624079, 540.8280743979684),
        (124.37500000000225, -37.142984146240735, 540.8280743979685),
        (124.37500000000234, -49.760412594989134, 493.7391903663766),
    ]]
    fillet(fillet8_edges, radius=FILLET8_R - 0.0001)  # a hair under: the kernel refuses the full size


solid = part.part
